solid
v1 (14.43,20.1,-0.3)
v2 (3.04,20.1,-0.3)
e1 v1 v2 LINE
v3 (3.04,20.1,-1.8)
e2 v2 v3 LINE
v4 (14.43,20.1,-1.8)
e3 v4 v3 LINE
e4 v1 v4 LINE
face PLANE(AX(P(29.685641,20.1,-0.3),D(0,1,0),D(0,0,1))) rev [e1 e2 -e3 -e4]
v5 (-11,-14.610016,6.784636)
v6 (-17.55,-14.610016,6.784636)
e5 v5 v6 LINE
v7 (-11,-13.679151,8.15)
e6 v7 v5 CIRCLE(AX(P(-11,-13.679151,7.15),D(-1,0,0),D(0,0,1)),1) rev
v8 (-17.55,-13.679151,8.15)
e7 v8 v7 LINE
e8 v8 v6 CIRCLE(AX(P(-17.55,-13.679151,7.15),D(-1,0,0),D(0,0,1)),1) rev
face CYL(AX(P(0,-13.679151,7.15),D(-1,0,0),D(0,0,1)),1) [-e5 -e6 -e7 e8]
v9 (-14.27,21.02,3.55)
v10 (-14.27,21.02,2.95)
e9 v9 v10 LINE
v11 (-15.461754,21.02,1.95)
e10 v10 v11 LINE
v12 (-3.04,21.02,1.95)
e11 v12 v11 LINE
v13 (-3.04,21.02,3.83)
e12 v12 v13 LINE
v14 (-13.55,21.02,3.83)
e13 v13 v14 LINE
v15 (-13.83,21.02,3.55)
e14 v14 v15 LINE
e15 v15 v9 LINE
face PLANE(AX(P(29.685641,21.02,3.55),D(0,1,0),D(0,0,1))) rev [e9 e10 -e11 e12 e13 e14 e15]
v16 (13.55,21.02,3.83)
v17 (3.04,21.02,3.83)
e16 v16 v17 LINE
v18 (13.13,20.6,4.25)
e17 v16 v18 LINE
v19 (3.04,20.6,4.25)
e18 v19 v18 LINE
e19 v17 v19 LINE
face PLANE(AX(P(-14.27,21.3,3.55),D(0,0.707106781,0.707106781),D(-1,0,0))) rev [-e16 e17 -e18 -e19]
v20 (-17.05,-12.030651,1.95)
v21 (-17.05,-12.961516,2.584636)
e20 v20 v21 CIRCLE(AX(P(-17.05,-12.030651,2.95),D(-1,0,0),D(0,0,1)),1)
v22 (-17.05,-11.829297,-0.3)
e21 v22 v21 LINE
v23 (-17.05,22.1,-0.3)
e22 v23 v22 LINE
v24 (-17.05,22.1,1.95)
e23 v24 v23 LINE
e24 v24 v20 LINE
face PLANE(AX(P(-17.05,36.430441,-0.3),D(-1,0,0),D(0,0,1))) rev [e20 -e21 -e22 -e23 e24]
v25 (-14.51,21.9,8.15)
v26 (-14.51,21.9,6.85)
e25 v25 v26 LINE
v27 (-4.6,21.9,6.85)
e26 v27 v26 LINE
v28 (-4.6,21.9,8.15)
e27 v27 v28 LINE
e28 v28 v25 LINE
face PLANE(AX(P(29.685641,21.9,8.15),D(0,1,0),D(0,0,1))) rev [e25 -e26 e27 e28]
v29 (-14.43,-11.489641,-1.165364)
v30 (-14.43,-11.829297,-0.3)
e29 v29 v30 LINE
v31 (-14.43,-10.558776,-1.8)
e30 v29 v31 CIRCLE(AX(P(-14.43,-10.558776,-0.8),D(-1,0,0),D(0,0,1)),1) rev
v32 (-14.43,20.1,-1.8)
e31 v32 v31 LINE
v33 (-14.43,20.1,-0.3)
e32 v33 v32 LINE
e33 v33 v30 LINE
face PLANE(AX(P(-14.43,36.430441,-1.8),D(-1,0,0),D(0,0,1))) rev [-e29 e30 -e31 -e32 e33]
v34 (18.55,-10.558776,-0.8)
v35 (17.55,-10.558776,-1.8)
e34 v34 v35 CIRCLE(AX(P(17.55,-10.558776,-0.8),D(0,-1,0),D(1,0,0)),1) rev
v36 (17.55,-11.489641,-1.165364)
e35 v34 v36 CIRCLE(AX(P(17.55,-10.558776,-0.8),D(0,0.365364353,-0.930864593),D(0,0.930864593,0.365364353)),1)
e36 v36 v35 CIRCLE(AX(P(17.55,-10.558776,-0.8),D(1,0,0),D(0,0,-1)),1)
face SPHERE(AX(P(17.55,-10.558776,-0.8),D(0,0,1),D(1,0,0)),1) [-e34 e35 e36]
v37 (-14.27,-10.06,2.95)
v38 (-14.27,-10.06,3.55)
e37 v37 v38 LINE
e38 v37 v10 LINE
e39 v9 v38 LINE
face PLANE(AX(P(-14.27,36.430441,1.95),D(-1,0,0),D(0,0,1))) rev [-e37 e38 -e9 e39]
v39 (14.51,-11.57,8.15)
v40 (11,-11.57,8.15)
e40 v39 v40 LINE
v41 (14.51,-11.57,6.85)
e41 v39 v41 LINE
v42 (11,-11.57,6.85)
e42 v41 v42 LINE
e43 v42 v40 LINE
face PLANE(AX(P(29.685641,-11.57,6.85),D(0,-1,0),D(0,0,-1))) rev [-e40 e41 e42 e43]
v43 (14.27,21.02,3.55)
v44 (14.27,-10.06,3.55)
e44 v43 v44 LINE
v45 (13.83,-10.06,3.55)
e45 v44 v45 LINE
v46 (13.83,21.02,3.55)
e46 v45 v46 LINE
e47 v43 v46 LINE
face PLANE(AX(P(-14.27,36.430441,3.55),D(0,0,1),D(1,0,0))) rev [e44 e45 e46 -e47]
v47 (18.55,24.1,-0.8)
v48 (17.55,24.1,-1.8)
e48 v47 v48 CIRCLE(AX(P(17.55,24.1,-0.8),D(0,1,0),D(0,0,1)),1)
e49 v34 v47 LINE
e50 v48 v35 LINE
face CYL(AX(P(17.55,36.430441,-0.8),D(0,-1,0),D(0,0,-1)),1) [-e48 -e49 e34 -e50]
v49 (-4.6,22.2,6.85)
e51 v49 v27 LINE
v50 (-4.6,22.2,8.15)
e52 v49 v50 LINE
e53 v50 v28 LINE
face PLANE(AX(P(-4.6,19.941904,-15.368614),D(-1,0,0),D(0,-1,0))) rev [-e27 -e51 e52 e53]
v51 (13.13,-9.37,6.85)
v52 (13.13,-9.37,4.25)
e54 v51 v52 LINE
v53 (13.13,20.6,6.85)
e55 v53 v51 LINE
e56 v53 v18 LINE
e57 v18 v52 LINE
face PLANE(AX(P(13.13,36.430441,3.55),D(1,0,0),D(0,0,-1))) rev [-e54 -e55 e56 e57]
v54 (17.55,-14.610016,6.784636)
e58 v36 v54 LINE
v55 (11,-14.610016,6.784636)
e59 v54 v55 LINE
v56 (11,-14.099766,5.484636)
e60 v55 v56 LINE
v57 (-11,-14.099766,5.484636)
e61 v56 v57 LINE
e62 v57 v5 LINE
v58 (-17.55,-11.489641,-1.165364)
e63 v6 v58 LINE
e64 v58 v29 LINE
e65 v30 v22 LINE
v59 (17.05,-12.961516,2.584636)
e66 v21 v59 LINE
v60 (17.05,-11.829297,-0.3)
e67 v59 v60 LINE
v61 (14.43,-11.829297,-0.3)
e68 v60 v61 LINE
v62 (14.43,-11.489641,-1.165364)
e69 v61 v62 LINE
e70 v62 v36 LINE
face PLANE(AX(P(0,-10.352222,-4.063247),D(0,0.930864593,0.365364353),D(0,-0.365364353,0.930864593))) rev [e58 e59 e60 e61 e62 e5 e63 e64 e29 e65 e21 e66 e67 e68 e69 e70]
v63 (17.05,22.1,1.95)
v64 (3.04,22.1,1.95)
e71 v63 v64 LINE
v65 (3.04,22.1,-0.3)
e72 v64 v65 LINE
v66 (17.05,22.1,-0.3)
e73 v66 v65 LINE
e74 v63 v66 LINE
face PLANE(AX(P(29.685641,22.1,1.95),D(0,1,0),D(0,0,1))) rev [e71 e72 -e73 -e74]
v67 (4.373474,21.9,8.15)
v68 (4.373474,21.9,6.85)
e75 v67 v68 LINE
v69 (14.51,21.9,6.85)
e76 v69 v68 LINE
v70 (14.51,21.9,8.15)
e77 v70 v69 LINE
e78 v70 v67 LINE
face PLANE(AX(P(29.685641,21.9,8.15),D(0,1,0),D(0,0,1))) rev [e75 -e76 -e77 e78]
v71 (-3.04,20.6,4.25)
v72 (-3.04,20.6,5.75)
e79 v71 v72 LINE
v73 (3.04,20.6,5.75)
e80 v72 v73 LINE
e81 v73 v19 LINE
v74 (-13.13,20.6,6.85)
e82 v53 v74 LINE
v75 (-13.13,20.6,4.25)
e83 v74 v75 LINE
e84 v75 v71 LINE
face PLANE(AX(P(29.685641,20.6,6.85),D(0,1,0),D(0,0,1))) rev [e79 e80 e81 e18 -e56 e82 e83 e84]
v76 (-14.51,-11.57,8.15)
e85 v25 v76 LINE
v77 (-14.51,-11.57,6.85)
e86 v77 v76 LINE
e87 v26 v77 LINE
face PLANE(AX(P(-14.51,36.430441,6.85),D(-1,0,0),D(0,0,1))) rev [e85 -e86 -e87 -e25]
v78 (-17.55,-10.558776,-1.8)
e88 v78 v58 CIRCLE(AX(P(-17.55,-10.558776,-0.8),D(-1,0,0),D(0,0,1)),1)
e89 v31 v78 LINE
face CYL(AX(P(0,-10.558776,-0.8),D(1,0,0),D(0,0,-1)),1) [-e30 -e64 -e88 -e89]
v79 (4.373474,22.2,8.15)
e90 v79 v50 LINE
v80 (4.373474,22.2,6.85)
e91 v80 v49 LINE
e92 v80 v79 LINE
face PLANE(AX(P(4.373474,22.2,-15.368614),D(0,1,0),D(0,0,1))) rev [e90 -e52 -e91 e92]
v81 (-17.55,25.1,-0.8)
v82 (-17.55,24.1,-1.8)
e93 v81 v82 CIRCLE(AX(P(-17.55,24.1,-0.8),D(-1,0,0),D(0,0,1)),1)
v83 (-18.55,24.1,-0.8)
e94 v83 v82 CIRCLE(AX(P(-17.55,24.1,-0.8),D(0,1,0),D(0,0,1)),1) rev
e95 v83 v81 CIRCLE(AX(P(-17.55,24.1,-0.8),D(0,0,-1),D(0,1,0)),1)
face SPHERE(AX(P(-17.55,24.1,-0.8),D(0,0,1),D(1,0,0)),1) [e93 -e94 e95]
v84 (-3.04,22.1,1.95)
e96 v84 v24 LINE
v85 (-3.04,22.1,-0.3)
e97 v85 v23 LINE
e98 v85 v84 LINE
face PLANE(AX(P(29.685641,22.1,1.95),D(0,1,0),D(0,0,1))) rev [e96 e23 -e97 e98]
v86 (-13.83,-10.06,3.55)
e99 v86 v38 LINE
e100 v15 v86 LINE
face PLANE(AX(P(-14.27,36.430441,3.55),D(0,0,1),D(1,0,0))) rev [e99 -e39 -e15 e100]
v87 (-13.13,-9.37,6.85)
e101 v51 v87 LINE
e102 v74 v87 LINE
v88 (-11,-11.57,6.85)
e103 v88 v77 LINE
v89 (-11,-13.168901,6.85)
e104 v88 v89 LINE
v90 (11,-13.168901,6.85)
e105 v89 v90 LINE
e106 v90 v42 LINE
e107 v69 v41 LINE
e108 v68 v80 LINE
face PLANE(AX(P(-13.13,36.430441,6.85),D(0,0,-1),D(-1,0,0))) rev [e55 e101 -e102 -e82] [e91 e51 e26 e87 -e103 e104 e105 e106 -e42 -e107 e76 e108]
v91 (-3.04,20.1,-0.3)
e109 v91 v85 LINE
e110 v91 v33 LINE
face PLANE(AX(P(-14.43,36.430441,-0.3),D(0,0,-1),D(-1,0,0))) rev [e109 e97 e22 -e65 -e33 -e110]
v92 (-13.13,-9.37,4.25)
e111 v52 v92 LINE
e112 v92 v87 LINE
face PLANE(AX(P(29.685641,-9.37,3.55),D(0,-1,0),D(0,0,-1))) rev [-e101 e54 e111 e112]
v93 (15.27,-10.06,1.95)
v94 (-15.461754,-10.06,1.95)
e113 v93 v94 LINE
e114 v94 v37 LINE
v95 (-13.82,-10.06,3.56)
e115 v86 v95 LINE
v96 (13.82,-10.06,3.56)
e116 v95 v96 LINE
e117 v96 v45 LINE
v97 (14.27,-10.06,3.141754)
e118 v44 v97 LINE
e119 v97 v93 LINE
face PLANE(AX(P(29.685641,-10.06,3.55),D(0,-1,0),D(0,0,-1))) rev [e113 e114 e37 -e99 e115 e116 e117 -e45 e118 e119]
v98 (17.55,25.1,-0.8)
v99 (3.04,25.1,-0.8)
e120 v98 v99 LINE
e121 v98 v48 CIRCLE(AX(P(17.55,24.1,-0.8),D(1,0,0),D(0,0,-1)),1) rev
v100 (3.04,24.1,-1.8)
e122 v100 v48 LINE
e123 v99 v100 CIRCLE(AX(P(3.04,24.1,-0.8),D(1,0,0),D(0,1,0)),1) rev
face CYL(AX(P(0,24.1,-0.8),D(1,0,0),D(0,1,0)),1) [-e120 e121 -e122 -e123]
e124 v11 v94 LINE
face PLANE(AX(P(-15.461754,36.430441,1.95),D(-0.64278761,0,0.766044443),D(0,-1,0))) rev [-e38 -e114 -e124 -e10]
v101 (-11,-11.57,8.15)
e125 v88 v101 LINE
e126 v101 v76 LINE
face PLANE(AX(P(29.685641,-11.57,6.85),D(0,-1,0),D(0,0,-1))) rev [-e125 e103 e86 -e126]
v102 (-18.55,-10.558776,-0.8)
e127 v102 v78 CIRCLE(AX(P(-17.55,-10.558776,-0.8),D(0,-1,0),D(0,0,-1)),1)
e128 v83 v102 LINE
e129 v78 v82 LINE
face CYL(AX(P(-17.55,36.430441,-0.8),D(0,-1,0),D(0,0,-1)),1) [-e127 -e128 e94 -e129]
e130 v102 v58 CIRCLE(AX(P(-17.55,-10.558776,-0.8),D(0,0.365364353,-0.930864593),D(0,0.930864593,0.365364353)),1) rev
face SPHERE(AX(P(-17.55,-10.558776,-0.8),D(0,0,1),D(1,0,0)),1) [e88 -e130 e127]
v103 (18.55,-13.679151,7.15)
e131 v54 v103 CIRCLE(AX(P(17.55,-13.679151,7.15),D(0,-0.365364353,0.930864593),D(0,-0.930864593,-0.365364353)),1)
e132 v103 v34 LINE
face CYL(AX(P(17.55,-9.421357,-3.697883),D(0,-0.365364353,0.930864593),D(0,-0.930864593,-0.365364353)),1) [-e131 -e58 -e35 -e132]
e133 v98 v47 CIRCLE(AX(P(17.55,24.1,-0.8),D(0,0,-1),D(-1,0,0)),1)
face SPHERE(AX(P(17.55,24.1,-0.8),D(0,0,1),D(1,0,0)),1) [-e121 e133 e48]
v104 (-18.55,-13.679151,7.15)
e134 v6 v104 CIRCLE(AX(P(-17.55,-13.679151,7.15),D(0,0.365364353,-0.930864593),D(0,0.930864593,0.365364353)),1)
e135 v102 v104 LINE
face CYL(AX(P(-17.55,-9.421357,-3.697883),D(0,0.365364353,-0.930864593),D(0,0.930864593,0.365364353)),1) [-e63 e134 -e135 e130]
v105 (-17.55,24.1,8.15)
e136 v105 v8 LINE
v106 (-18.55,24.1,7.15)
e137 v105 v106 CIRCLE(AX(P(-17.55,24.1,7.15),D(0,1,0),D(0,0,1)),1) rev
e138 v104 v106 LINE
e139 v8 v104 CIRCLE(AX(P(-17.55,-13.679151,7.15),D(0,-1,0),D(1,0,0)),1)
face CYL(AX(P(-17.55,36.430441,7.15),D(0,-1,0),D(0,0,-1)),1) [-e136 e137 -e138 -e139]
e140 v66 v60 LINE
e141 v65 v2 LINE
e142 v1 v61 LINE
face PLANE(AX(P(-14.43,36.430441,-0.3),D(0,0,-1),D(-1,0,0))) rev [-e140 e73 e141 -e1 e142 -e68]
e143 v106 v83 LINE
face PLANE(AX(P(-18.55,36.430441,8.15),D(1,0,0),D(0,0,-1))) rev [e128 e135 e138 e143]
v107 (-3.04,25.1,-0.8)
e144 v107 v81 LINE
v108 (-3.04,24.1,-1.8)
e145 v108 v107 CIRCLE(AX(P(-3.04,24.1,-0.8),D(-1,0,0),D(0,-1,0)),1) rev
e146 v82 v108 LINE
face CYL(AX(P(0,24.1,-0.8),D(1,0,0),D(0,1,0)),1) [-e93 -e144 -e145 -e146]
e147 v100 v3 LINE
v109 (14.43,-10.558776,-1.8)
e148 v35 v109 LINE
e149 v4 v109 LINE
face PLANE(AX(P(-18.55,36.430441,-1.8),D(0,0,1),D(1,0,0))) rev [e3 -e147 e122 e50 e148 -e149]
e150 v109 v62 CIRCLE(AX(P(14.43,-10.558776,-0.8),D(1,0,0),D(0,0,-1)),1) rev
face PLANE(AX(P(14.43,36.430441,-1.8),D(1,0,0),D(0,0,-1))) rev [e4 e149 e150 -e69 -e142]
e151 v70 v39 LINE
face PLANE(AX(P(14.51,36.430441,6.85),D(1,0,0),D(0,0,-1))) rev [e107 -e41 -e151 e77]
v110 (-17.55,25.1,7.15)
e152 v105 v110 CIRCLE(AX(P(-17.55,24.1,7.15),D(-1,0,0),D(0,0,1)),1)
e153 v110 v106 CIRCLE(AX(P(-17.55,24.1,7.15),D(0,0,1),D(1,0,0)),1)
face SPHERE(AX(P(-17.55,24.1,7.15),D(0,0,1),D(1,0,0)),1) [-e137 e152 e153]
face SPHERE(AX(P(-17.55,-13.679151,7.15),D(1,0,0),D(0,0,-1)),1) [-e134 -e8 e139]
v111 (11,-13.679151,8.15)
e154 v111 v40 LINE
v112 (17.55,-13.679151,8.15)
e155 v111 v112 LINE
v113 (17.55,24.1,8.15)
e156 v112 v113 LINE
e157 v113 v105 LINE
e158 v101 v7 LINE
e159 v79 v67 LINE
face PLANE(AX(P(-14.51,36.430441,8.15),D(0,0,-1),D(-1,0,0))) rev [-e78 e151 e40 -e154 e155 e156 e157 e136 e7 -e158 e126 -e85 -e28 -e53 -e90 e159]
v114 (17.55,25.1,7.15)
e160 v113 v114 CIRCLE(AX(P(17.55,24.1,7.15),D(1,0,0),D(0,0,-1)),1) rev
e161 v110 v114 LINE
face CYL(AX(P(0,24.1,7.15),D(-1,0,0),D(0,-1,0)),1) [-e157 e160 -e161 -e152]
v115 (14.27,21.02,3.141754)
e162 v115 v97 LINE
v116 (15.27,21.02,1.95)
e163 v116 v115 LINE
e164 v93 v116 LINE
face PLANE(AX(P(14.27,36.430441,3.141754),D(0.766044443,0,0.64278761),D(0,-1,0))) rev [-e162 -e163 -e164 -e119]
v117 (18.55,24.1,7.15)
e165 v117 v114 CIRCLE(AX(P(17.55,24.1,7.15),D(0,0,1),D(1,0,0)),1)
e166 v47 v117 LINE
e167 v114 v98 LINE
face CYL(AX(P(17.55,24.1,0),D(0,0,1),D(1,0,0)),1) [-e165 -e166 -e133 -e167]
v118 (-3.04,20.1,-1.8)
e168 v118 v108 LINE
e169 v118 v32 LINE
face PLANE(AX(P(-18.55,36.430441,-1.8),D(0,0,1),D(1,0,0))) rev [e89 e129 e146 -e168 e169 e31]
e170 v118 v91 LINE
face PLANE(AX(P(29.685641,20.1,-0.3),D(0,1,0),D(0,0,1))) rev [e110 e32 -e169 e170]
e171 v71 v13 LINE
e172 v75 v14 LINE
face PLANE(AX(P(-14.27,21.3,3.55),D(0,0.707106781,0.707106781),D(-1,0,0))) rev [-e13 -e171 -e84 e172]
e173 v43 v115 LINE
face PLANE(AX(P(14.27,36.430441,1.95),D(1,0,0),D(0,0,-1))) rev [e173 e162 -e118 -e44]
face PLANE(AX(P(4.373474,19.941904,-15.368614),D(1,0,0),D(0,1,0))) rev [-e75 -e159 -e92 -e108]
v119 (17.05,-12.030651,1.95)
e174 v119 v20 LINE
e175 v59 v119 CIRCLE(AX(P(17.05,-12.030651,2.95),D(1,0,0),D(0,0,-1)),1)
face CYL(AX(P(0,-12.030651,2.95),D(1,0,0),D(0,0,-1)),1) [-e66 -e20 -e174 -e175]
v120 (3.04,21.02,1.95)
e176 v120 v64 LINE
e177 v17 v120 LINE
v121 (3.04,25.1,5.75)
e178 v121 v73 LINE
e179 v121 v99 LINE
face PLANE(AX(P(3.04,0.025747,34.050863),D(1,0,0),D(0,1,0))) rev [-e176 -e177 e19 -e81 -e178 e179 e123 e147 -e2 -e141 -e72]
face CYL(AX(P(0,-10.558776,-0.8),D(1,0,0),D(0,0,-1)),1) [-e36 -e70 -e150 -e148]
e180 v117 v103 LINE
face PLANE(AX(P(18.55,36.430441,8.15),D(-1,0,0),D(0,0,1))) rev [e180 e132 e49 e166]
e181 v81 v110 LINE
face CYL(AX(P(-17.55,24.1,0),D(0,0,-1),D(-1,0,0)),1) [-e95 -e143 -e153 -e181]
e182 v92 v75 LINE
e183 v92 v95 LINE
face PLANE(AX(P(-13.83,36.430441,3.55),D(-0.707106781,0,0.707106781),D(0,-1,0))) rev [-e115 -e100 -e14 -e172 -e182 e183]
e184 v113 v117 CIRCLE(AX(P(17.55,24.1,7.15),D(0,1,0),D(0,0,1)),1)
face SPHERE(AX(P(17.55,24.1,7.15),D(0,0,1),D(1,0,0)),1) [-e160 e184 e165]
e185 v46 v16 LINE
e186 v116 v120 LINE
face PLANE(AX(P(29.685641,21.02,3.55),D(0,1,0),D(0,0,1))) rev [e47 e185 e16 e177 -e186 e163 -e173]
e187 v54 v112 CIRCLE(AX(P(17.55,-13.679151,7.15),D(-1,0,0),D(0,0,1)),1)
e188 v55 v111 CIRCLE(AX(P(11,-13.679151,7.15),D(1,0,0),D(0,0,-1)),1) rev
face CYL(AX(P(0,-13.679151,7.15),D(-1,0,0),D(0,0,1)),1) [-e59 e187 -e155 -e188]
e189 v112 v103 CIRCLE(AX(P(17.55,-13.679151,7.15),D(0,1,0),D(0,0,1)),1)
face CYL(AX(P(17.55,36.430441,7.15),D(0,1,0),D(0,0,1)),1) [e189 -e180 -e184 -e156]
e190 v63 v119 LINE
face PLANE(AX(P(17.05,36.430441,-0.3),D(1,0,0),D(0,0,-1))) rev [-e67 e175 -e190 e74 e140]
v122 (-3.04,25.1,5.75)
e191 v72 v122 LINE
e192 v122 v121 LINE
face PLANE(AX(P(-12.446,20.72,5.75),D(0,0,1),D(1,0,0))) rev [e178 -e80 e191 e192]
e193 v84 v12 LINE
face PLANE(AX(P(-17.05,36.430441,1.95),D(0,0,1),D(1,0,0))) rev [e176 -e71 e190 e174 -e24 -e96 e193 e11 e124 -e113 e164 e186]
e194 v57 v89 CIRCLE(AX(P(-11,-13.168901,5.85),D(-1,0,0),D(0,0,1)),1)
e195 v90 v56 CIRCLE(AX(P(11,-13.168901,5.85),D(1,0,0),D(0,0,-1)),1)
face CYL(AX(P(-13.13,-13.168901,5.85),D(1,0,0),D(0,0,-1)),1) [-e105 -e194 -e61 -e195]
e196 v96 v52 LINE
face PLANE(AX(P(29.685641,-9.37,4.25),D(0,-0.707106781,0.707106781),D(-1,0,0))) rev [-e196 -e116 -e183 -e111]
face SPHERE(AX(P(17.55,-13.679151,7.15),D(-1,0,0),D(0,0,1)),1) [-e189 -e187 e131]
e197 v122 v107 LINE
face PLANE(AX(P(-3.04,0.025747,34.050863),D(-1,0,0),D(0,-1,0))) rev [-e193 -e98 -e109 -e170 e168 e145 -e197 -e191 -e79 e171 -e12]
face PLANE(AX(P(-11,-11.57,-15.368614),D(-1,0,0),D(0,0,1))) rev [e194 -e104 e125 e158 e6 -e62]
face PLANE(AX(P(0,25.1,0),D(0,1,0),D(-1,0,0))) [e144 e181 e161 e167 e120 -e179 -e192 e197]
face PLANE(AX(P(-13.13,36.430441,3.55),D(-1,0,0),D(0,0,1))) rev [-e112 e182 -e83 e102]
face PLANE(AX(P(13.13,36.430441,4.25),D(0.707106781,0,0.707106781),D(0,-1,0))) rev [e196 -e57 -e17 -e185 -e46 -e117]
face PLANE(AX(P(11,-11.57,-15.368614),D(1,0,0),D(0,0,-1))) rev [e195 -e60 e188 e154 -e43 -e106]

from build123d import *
from OCP.BRepFilletAPI import BRepFilletAPI_MakeChamfer

# Parameters (mm, degrees)
BOSS_EXTRUDE1_START    = -18.55
BOSS_EXTRUDE1_DEPTH    = 4.04
BOSS_EXTRUDE1_START_2  = -14.51
BOSS_EXTRUDE1_2_DEPTH  = 1.38
BOSS_EXTRUDE1_3_DEPTH  = 1.5
BOSS_EXTRUDE1_4_DEPTH  = 0.24
BOSS_EXTRUDE1_5_DEPTH  = 0.08
BOSS_EXTRUDE1_START_3  = 14.51
BOSS_EXTRUDE1_6_DEPTH  = 4.04
BOSS_EXTRUDE1_START_4  = 13.13
BOSS_EXTRUDE1_7_DEPTH  = 1.38
BOSS_EXTRUDE1_START_5  = 17.05
BOSS_EXTRUDE1_8_DEPTH  = 1.5
BOSS_EXTRUDE1_START_6  = 14.27
BOSS_EXTRUDE1_9_DEPTH  = 0.24
BOSS_EXTRUDE1_START_7  = 14.43
BOSS_EXTRUDE1_10_DEPTH = 0.08
BOSS_EXTRUDE2_START    = -17.05
BOSS_EXTRUDE2_DEPTH    = 34.1
FILLET1_R              = 1
SKETCH5_W              = 22
SKETCH5_H              = 3.109151444
SKETCH5_W_2            = 8.973474185
SKETCH5_H_2            = 2.258096186
CUT_EXTRUDE1_DEPTH     = 1.3
CHAMFER1_SIZE          = 0.7
FILLET2_R              = 1
SKETCH6_W              = 6.08
SKETCH6_H              = 25.074252642
CUT_EXTRUDE2_DEPTH     = 7.55
CHAMFER3_SIZE          = 1
CHAMFER3_SIZE2         = 1.191753593


with BuildPart() as part:
    # Boss-Extrude1: read off the stored shape, not the designer's step
    # Boss-Extrude1 outline → Boss-Extrude1 (new body)
    with BuildSketch(Plane.YZ.offset(BOSS_EXTRUDE1_START)):
        Polygon((-11.240546545, -1.8), (25.1, -1.8), (25.1, -0.3), (-11.829296545, -0.3), align=None)
        Polygon((-12.712421545, 1.95), (25.1, 1.95), (25.1, 8.15), (-15.145921545, 8.15), align=None)
    extrude(amount=BOSS_EXTRUDE1_DEPTH)

    # Boss-Extrude1 2 outline → Boss-Extrude1 2 (add)
    with BuildSketch(Plane.YZ.offset(BOSS_EXTRUDE1_START_2)):
        Polygon((-13.340421545, 3.55), (25.1, 3.55), (25.1, 6.85), (-14.635671545, 6.85), align=None)
    extrude(amount=BOSS_EXTRUDE1_2_DEPTH)

    # Boss-Extrude1 3 outline → Boss-Extrude1 3 (add)
    with BuildSketch(Plane.YZ.offset(BOSS_EXTRUDE1_START)):
        Polygon((-11.829296545, -0.3), (25.1, -0.3), (25.1, 1.95), (-12.712421545, 1.95), align=None)
    extrude(amount=BOSS_EXTRUDE1_3_DEPTH)

    # Boss-Extrude1 4 outline → Boss-Extrude1 4 (add)
    with BuildSketch(Plane.YZ.offset(BOSS_EXTRUDE1_START_2)):
        Polygon((-12.712421545, 1.95), (25.1, 1.95), (25.1, 3.55), (-13.340421545, 3.55), align=None)
    extrude(amount=BOSS_EXTRUDE1_4_DEPTH)

    # Boss-Extrude1 5 outline → Boss-Extrude1 5 (add)
    with BuildSketch(Plane.YZ.offset(BOSS_EXTRUDE1_START_2)):
        Polygon((-11.240546545, -1.8), (25.1, -1.8), (25.1, -0.3), (-11.829296545, -0.3), align=None)
    extrude(amount=BOSS_EXTRUDE1_5_DEPTH)



with BuildPart() as body_2:
    # Boss-Extrude1 6 outline → Boss-Extrude1 6 (new body)
    with BuildSketch(Plane.YZ.offset(BOSS_EXTRUDE1_START_3)):
        Polygon((-11.240546545, -1.8), (25.1, -1.8), (25.1, -0.3), (-11.829296545, -0.3), align=None)
        Polygon((-12.712421545, 1.95), (25.1, 1.95), (25.1, 8.15), (-15.145921545, 8.15), align=None)
    extrude(amount=BOSS_EXTRUDE1_6_DEPTH)

    # Boss-Extrude1 7 outline → Boss-Extrude1 7 (add)
    with BuildSketch(Plane.YZ.offset(BOSS_EXTRUDE1_START_4)):
        Polygon((-13.340421545, 3.55), (25.1, 3.55), (25.1, 6.85), (-14.635671545, 6.85), align=None)
    extrude(amount=BOSS_EXTRUDE1_7_DEPTH)

    # Boss-Extrude1 8 outline → Boss-Extrude1 8 (add)
    with BuildSketch(Plane.YZ.offset(BOSS_EXTRUDE1_START_5)):
        Polygon((-11.829296545, -0.3), (25.1, -0.3), (25.1, 1.95), (-12.712421545, 1.95), align=None)
    extrude(amount=BOSS_EXTRUDE1_8_DEPTH)

    # Boss-Extrude1 9 outline → Boss-Extrude1 9 (add)
    with BuildSketch(Plane.YZ.offset(BOSS_EXTRUDE1_START_6)):
        Polygon((-12.712421545, 1.95), (25.1, 1.95), (25.1, 3.55), (-13.340421545, 3.55), align=None)
    extrude(amount=BOSS_EXTRUDE1_9_DEPTH)

    # Boss-Extrude1 10 outline → Boss-Extrude1 10 (add)
    with BuildSketch(Plane.YZ.offset(BOSS_EXTRUDE1_START_7)):
        Polygon((-11.240546545, -1.8), (25.1, -1.8), (25.1, -0.3), (-11.829296545, -0.3), align=None)
    extrude(amount=BOSS_EXTRUDE1_10_DEPTH)


with BuildPart() as part_1:
    add(part.part)

    add(body_2.part)  # Boss-Extrude2 merges body 2
    # Sketch4 → Boss-Extrude2 (add)
    with BuildSketch(Plane(origin=(0, 0, 0), x_dir=(0, 0, -1), z_dir=(1, 0, 0)).offset(BOSS_EXTRUDE2_START)):
        Polygon((1.8, 25.1), (-8.15, 25.1), (-8.15, 21.9), (-6.85, 21.9), (-6.85, 20.6), (-3.55, 20.6), (-3.55, 21.02), (-1.95, 21.02), (-1.95, 22.1), (0.3, 22.1), (0.3, 20.1), (1.8, 20.1), (1.8, 22.1), align=None)
        Polygon((-3.55, -10.06), (-1.95, -10.06), (-1.95, -12.712421545), (-8.15, -15.145921545), (-8.15, -11.57), (-6.85, -11.57), (-6.85, -9.37), (-3.55, -9.37), align=None)
    extrude(amount=BOSS_EXTRUDE2_DEPTH)

    # Fillet1
    fillet1_edges = [part_1.edges().sort_by_distance(p)[0] for p in [
        (0, -12.712421545, 1.95),
        (0, -15.145921545, 8.15),
    ]]
    fillet(fillet1_edges, radius=FILLET1_R)

    # Sketch5 → Cut-Extrude1 (cut)
    with BuildSketch(Plane.XY.offset(8.15)):
        with Locations((0, -13.124575722)):
            Rectangle(SKETCH5_W, SKETCH5_H)
        with Locations((-0.113262908, 21.070951907)):
            Rectangle(SKETCH5_W_2, SKETCH5_H_2)
    extrude(amount=-CUT_EXTRUDE1_DEPTH, mode=Mode.SUBTRACT)

    # Chamfer1
    # the kernel refuses this chamfer: 0.7 mm, written as the material it takes off along each edge
    with BuildSketch(Plane(origin=(-13.13, 20.6, 3.55), x_dir=(0, 1, 0), z_dir=(1, 0, 0))) as chamfer1_piece_1_section:
        Polygon((CHAMFER1_SIZE, 0), (0, CHAMFER1_SIZE), (0, 0), align=None)
    chamfer1_piece_1 = extrude(amount=26.26, mode=Mode.PRIVATE)
    chamfer1_piece_1 = split(chamfer1_piece_1, bisect_by=Plane(origin=(-13.13, 21.02, 3.55), z_dir=(0, -1, 0)), keep=Keep.TOP, mode=Mode.PRIVATE)
    add(chamfer1_piece_1, mode=Mode.SUBTRACT)
    with BuildSketch(Plane(origin=(13.13, -9.37, 3.55), x_dir=(1, 0, 0), z_dir=(0, 1, 0))) as chamfer1_piece_2:
        Polygon((CHAMFER1_SIZE, 0), (0, -CHAMFER1_SIZE), (0, 0), align=None)
    extrude(amount=29.97, mode=Mode.SUBTRACT)
    with BuildSketch(Plane(origin=(-13.13, -9.37, 3.55), x_dir=(0, -1, 0), z_dir=(1, 0, 0))) as chamfer1_piece_3_section:
        Polygon((CHAMFER1_SIZE, 0), (0, -CHAMFER1_SIZE), (0, 0), align=None)
    chamfer1_piece_3 = extrude(amount=26.26, mode=Mode.PRIVATE)
    chamfer1_piece_3 = split(chamfer1_piece_3, bisect_by=Plane(origin=(-13.13, -10.06, 3.55), z_dir=(0, 1, 0)), keep=Keep.TOP, mode=Mode.PRIVATE)
    add(chamfer1_piece_3, mode=Mode.SUBTRACT)
    with BuildSketch(Plane(origin=(-13.13, -9.37, 3.55), x_dir=(-1, 0, 0), z_dir=(0, 1, 0))) as chamfer1_piece_4:
        Polygon((CHAMFER1_SIZE, 0), (0, CHAMFER1_SIZE), (0, 0), align=None)
    extrude(amount=29.97, mode=Mode.SUBTRACT)
    with BuildSketch(Plane(origin=(-14.930178092, 20.6, 3.55), x_dir=(0, 1, 0), z_dir=(1, 0, 0))) as chamfer1_piece_5a_section:
        Polygon((CHAMFER1_SIZE, 0), (0, CHAMFER1_SIZE), (0, 0), align=None)
    chamfer1_piece_5a = extrude(amount=28.060178092, mode=Mode.PRIVATE)
    chamfer1_piece_5a = split(chamfer1_piece_5a, bisect_by=Plane(origin=(-14.27, 20.6, 3.55), z_dir=(1, 0, 0)), keep=Keep.TOP, mode=Mode.PRIVATE)
    chamfer1_piece_5a = split(chamfer1_piece_5a, bisect_by=Plane(origin=(-14.930178092, 21.02, 3.55), z_dir=(0, -1, 0)), keep=Keep.TOP, mode=Mode.PRIVATE)
    chamfer1_piece_5a = split(chamfer1_piece_5a, bisect_by=Plane(origin=(-13.13, 20.6, 3.55), z_dir=(-1, 0, 0)), keep=Keep.TOP, mode=Mode.PRIVATE)
    with BuildSketch(Plane(origin=(-13.13, -9.37, 3.55), x_dir=(-1, 0, 0), z_dir=(0, 1, 0))) as chamfer1_piece_5b_section:
        Polygon((CHAMFER1_SIZE, 0), (0, CHAMFER1_SIZE), (0, 0), align=None)
    chamfer1_piece_5b = extrude(amount=31.770178092, mode=Mode.PRIVATE)
    chamfer1_piece_5b = split(chamfer1_piece_5b, bisect_by=Plane(origin=(-13.13, 21.02, 3.55), z_dir=(0, -1, 0)), keep=Keep.TOP, mode=Mode.PRIVATE)
    chamfer1_piece_5b = split(chamfer1_piece_5b, bisect_by=Plane(origin=(-13.13, 20.6, 3.55), z_dir=(0, 1, 0)), keep=Keep.TOP, mode=Mode.PRIVATE)
    chamfer1_piece_5 = chamfer1_piece_5a & chamfer1_piece_5b
    add(chamfer1_piece_5, mode=Mode.SUBTRACT)
    with BuildSketch(Plane(origin=(-13.13, 20.6, 3.55), x_dir=(0, 1, 0), z_dir=(1, 0, 0))) as chamfer1_piece_6a_section:
        Polygon((CHAMFER1_SIZE, 0), (0, CHAMFER1_SIZE), (0, 0), align=None)
    chamfer1_piece_6a = extrude(amount=28.060178092, mode=Mode.PRIVATE)
    chamfer1_piece_6a = split(chamfer1_piece_6a, bisect_by=Plane(origin=(-13.13, 21.02, 3.55), z_dir=(0, -1, 0)), keep=Keep.TOP, mode=Mode.PRIVATE)
    chamfer1_piece_6a = split(chamfer1_piece_6a, bisect_by=Plane(origin=(14.27, 20.6, 3.55), z_dir=(-1, 0, 0)), keep=Keep.TOP, mode=Mode.PRIVATE)
    chamfer1_piece_6a = split(chamfer1_piece_6a, bisect_by=Plane(origin=(13.13, 20.6, 3.55), z_dir=(1, 0, 0)), keep=Keep.TOP, mode=Mode.PRIVATE)
    with BuildSketch(Plane(origin=(13.13, -9.37, 3.55), x_dir=(1, 0, 0), z_dir=(0, 1, 0))) as chamfer1_piece_6b_section:
        Polygon((CHAMFER1_SIZE, 0), (0, -CHAMFER1_SIZE), (0, 0), align=None)
    chamfer1_piece_6b = extrude(amount=31.770178092, mode=Mode.PRIVATE)
    chamfer1_piece_6b = split(chamfer1_piece_6b, bisect_by=Plane(origin=(13.13, 21.02, 3.55), z_dir=(0, -1, 0)), keep=Keep.TOP, mode=Mode.PRIVATE)
    chamfer1_piece_6b = split(chamfer1_piece_6b, bisect_by=Plane(origin=(13.13, 20.6, 3.55), z_dir=(0, 1, 0)), keep=Keep.TOP, mode=Mode.PRIVATE)
    chamfer1_piece_6 = chamfer1_piece_6a & chamfer1_piece_6b
    add(chamfer1_piece_6, mode=Mode.SUBTRACT)
    with BuildSketch(Plane(origin=(13.13, -11.170178092, 3.55), x_dir=(1, 0, 0), z_dir=(0, 1, 0))) as chamfer1_piece_7a_section:
        Polygon((CHAMFER1_SIZE, 0), (0, -CHAMFER1_SIZE), (0, 0), align=None)
    chamfer1_piece_7a = extrude(amount=31.770178092, mode=Mode.PRIVATE)
    chamfer1_piece_7a = split(chamfer1_piece_7a, bisect_by=Plane(origin=(13.13, -10.06, 3.55), z_dir=(0, 1, 0)), keep=Keep.TOP, mode=Mode.PRIVATE)
    chamfer1_piece_7a = split(chamfer1_piece_7a, bisect_by=Plane(origin=(13.13, -9.37, 3.55), z_dir=(0, -1, 0)), keep=Keep.TOP, mode=Mode.PRIVATE)
    with BuildSketch(Plane(origin=(-13.13, -9.37, 3.55), x_dir=(0, -1, 0), z_dir=(1, 0, 0))) as chamfer1_piece_7b_section:
        Polygon((CHAMFER1_SIZE, 0), (0, -CHAMFER1_SIZE), (0, 0), align=None)
    chamfer1_piece_7b = extrude(amount=28.060178092, mode=Mode.PRIVATE)
    chamfer1_piece_7b = split(chamfer1_piece_7b, bisect_by=Plane(origin=(-13.13, -10.06, 3.55), z_dir=(0, 1, 0)), keep=Keep.TOP, mode=Mode.PRIVATE)
    chamfer1_piece_7b = split(chamfer1_piece_7b, bisect_by=Plane(origin=(14.27, -9.37, 3.55), z_dir=(-1, 0, 0)), keep=Keep.TOP, mode=Mode.PRIVATE)
    chamfer1_piece_7b = split(chamfer1_piece_7b, bisect_by=Plane(origin=(13.13, -9.37, 3.55), z_dir=(1, 0, 0)), keep=Keep.TOP, mode=Mode.PRIVATE)
    chamfer1_piece_7 = chamfer1_piece_7a & chamfer1_piece_7b
    add(chamfer1_piece_7, mode=Mode.SUBTRACT)
    with BuildSketch(Plane(origin=(-14.930178092, -9.37, 3.55), x_dir=(0, -1, 0), z_dir=(1, 0, 0))) as chamfer1_piece_8a_section:
        Polygon((CHAMFER1_SIZE, 0), (0, -CHAMFER1_SIZE), (0, 0), align=None)
    chamfer1_piece_8a = extrude(amount=28.060178092, mode=Mode.PRIVATE)
    chamfer1_piece_8a = split(chamfer1_piece_8a, bisect_by=Plane(origin=(-14.27, -9.37, 3.55), z_dir=(1, 0, 0)), keep=Keep.TOP, mode=Mode.PRIVATE)
    chamfer1_piece_8a = split(chamfer1_piece_8a, bisect_by=Plane(origin=(-14.930178092, -10.06, 3.55), z_dir=(0, 1, 0)), keep=Keep.TOP, mode=Mode.PRIVATE)
    chamfer1_piece_8a = split(chamfer1_piece_8a, bisect_by=Plane(origin=(-13.13, -9.37, 3.55), z_dir=(-1, 0, 0)), keep=Keep.TOP, mode=Mode.PRIVATE)
    with BuildSketch(Plane(origin=(-13.13, -11.170178092, 3.55), x_dir=(-1, 0, 0), z_dir=(0, 1, 0))) as chamfer1_piece_8b_section:
        Polygon((CHAMFER1_SIZE, 0), (0, CHAMFER1_SIZE), (0, 0), align=None)
    chamfer1_piece_8b = extrude(amount=31.770178092, mode=Mode.PRIVATE)
    chamfer1_piece_8b = split(chamfer1_piece_8b, bisect_by=Plane(origin=(-13.13, -10.06, 3.55), z_dir=(0, 1, 0)), keep=Keep.TOP, mode=Mode.PRIVATE)
    chamfer1_piece_8b = split(chamfer1_piece_8b, bisect_by=Plane(origin=(-13.13, -9.37, 3.55), z_dir=(0, -1, 0)), keep=Keep.TOP, mode=Mode.PRIVATE)
    chamfer1_piece_8 = chamfer1_piece_8a & chamfer1_piece_8b
    add(chamfer1_piece_8, mode=Mode.SUBTRACT)

    # Fillet2
    # the kernel refuses this fillet: 1 mm, written as the material it takes off along each edge
    with BuildSketch(Plane(origin=(-17.55, 24.1, 7.15), x_dir=(-1, 0, 0), z_dir=(0, 0, 1))) as fillet2_piece_1_section:
        Polygon((0, 0), (FILLET2_R, 0), (FILLET2_R, -FILLET2_R), (0, -FILLET2_R), align=None)
    fillet2_piece_1 = extrude(amount=FILLET2_R, mode=Mode.PRIVATE)
    fillet2_piece_1 = fillet2_piece_1 - Plane(origin=(-17.55, 24.1, 7.15), x_dir=(0.7071067811865475, -0.7071067811865475, 0), z_dir=(0, 0, 1)) * Sphere(FILLET2_R, mode=Mode.PRIVATE)
    add(fillet2_piece_1, mode=Mode.SUBTRACT)
    with BuildSketch(Plane(origin=(17.55, -10.558776444, -0.8), x_dir=(0, 0, -1), z_dir=(1, 0, 0))) as fillet2_piece_2_section:
        Polygon((0, 0), (FILLET2_R, 0), (FILLET2_R, -FILLET2_R * 0.681770101045), (FILLET2_R * 0.365364352613, -FILLET2_R * 0.930864592645), align=None)
    fillet2_piece_2 = extrude(amount=FILLET2_R, mode=Mode.PRIVATE)
    fillet2_piece_2 = fillet2_piece_2 - Plane(origin=(17.55, -10.558776444, -0.8), x_dir=(0, 0.5633097049523215, 0.8262458328527464), z_dir=(1, 0, 0)) * Sphere(FILLET2_R, mode=Mode.PRIVATE)
    add(fillet2_piece_2, mode=Mode.SUBTRACT)
    with BuildSketch(Plane(origin=(-17.55, -10.558776444, -0.8), x_dir=(0, -0.9308645926447314, -0.36536435261305716), z_dir=(-1, 0, 0))) as fillet2_piece_3_section:
        Polygon((0, 0), (FILLET2_R, 0), (FILLET2_R, -FILLET2_R * 0.681770101045), (FILLET2_R * 0.365364352613, -FILLET2_R * 0.930864592645), align=None)
    fillet2_piece_3 = extrude(amount=FILLET2_R, mode=Mode.PRIVATE)
    fillet2_piece_3 = fillet2_piece_3 - Plane(origin=(-17.55, -10.558776444, -0.8), x_dir=(0, 0.5633097049523215, 0.8262458328527464), z_dir=(-1, 0, 0)) * Sphere(FILLET2_R, mode=Mode.PRIVATE)
    add(fillet2_piece_3, mode=Mode.SUBTRACT)
    with BuildSketch(Plane(origin=(17.55, 24.1, 7.15), x_dir=(0, 0, 1), z_dir=(1, 0, 0))) as fillet2_piece_4_section:
        Polygon((0, 0), (FILLET2_R, 0), (FILLET2_R, -FILLET2_R), (0, -FILLET2_R), align=None)
    fillet2_piece_4 = extrude(amount=FILLET2_R, mode=Mode.PRIVATE)
    fillet2_piece_4 = fillet2_piece_4 - Plane(origin=(17.55, 24.1, 7.15), x_dir=(0, -0.7071067811865475, -0.7071067811865475), z_dir=(1, 0, 0)) * Sphere(FILLET2_R, mode=Mode.PRIVATE)
    add(fillet2_piece_4, mode=Mode.SUBTRACT)
    with BuildSketch(Plane(origin=(17.55, 24.1, -0.8), x_dir=(0, 0, -1), z_dir=(1, 0, 0))) as fillet2_piece_5_section:
        Polygon((0, 0), (FILLET2_R, 0), (FILLET2_R, FILLET2_R), (0, FILLET2_R), align=None)
    fillet2_piece_5 = extrude(amount=FILLET2_R, mode=Mode.PRIVATE)
    fillet2_piece_5 = fillet2_piece_5 - Plane(origin=(17.55, 24.1, -0.8), x_dir=(0, -0.7071067811865475, 0.7071067811865475), z_dir=(1, 0, 0)) * Sphere(FILLET2_R, mode=Mode.PRIVATE)
    add(fillet2_piece_5, mode=Mode.SUBTRACT)
    with BuildSketch(Plane(origin=(-17.55, 24.1, -0.8), x_dir=(-1, 0, 0), z_dir=(0, 0, -1))) as fillet2_piece_6_section:
        Polygon((0, 0), (FILLET2_R, 0), (FILLET2_R, FILLET2_R), (0, FILLET2_R), align=None)
    fillet2_piece_6 = extrude(amount=FILLET2_R, mode=Mode.PRIVATE)
    fillet2_piece_6 = fillet2_piece_6 - Plane(origin=(-17.55, 24.1, -0.8), x_dir=(0.7071067811865475, -0.7071067811865475, 0), z_dir=(0, 0, -1)) * Sphere(FILLET2_R, mode=Mode.PRIVATE)
    add(fillet2_piece_6, mode=Mode.SUBTRACT)
    with BuildSketch(Plane(origin=(-18.55, 24.1, 8.15), x_dir=(0, 0, -1), z_dir=(0, -1, 0))) as fillet2_piece_7:
        with BuildLine():
            CenterArc((FILLET2_R, FILLET2_R), FILLET2_R, 180, 90)
            Line((0, FILLET2_R), (0, 0))
            Line((0, 0), (FILLET2_R, 0))
        make_face()
    extrude(amount=37.779151444, mode=Mode.SUBTRACT)
    with BuildSketch(Plane(origin=(18.55, -11.489641037, -1.165364353), x_dir=(0, 0.9308645926447314, 0.36536435261305694), z_dir=(0, -0.365364352613057, 0.9308645926447315)), Plane(origin=(-18.55, -14.610016037, 6.784635647), x_dir=(0, 0.9308645926447315, 0.365364352613057), z_dir=(0, 0.365364352613057, -0.9308645926447315))) as fillet2_piece_8:
        with BuildLine():
            CenterArc((FILLET2_R, FILLET2_R), FILLET2_R, 180, 90)
            Line((0, FILLET2_R), (0, 0))
            Line((0, 0), (FILLET2_R, 0))
        make_face()
    extrude(amount=8.540447303, mode=Mode.SUBTRACT)
    with BuildSketch(Plane(origin=(12.725574747, -11.240546545, -1.8), x_dir=(0, 1, 0), z_dir=(1, 0, 0)), Plane(origin=(-17.55, -11.240546545, -1.8), x_dir=(0, 1, 0), z_dir=(1, 0, 0))) as fillet2_piece_9:
        with BuildLine():
            CenterArc((FILLET2_R * 0.681770101045, FILLET2_R), FILLET2_R, 201.430007302, 68.569992698)
            Line((-FILLET2_R * 0.249094491599, FILLET2_R * 0.634635647387), (0, 0))
            Line((0, 0), (FILLET2_R * 0.681770101045, 0))
        make_face()
    extrude(amount=4.824425253, mode=Mode.SUBTRACT)
    with BuildSketch(Plane(origin=(-18.55, -13.679151444, 7.15), x_dir=(0, -0.930864592644731, -0.3653643526130583), z_dir=(0, 0.3653643526130583, -0.930864592644731))) as fillet2_piece_10:
        with BuildLine():
            CenterArc((1 - FILLET2_R, -FILLET2_R), FILLET2_R, 0, 90)
            Line((1, -FILLET2_R), (1, 0))
            Line((1, 0), (1 - FILLET2_R, 0))
        make_face()
    revolve(axis=Axis((-18.55, -13.679151444, 7.15), (-1, 0, 0)), revolution_arc=111.430007302, mode=Mode.SUBTRACT)
    with BuildSketch(Plane(origin=(18.55, 24.1, 8.15), x_dir=(0, 0, -1), z_dir=(0, -1, 0))) as fillet2_piece_11:
        with BuildLine():
            CenterArc((FILLET2_R, -FILLET2_R), FILLET2_R, 90, 90)
            Line((0, -FILLET2_R), (0, 0))
            Line((0, 0), (FILLET2_R, 0))
        make_face()
    extrude(amount=37.779151444, mode=Mode.SUBTRACT)
    with BuildSketch(Plane(origin=(18.55, -13.679151444, 7.15), x_dir=(0, -0.9308645926447313, -0.3653643526130575), z_dir=(0, 0.3653643526130575, -0.9308645926447313))) as fillet2_piece_12:
        with BuildLine():
            CenterArc((1 - FILLET2_R, FILLET2_R), FILLET2_R, 270, 90)
            Line((1, FILLET2_R), (1, 0))
            Line((1, 0), (1 - FILLET2_R, 0))
        make_face()
    revolve(axis=Axis((18.55, -13.679151444, 7.15), (-1, 0, 0)), revolution_arc=111.430007302, mode=Mode.SUBTRACT)
    with BuildSketch(Plane(origin=(-11, -14.633090645, 6.85), x_dir=(0, 1, 0), z_dir=(1, 0, 0))) as fillet2_piece_13:
        with BuildLine():
            CenterArc((1.464189201, -1), FILLET2_R, 90, 111.430007302)
            Line((0.533324609, -1.365364353), (0.44023815, -1.401900788))
            ThreePointArc((0.44023815, -1.401900788), (-0.07001185, -0.101900788), (-0.09539392, -0.03))
            Line((-0.09539392, -0.03), (0, 0.1))
            Line((0, 0.1), (1.464189201, 0.1))
            Line((1.464189201, 0.1), (1.464189201, 0))
        make_face()
    extrude(amount=22, mode=Mode.SUBTRACT)
    with BuildSketch(Plane(origin=(17.55, 25.1, -1.8), x_dir=(0, -1, 0), z_dir=(-1, 0, 0))) as fillet2_piece_14:
        with BuildLine():
            CenterArc((FILLET2_R, FILLET2_R), FILLET2_R, 180, 90)
            Line((0, FILLET2_R), (0, 0))
            Line((0, 0), (FILLET2_R, 0))
        make_face()
    extrude(amount=35.1, mode=Mode.SUBTRACT)
    with BuildSketch(Plane(origin=(-18.55, 25.1, -0.8), x_dir=(0, -1, 0), z_dir=(0, 0, 1)), Plane(origin=(18.55, 25.1, 7.15), x_dir=(0, -1, 0), z_dir=(0, 0, -1))) as fillet2_piece_15:
        with BuildLine():
            CenterArc((FILLET2_R, FILLET2_R), FILLET2_R, 180, 90)
            Line((0, FILLET2_R), (0, 0))
            Line((0, 0), (FILLET2_R, 0))
        make_face()
    extrude(amount=7.95, mode=Mode.SUBTRACT)
    with BuildSketch(Plane(origin=(-17.55, 25.1, 8.15), x_dir=(0, 0, -1), z_dir=(1, 0, 0))) as fillet2_piece_16:
        with BuildLine():
            CenterArc((FILLET2_R, -FILLET2_R), FILLET2_R, 90, 90)
            Line((0, -FILLET2_R), (0, 0))
            Line((0, 0), (FILLET2_R, 0))
        make_face()
    extrude(amount=35.1, mode=Mode.SUBTRACT)
    with BuildSketch(Plane(origin=(18.55, -10.558776444, -1.8), x_dir=(0, 0, 1), z_dir=(0, 1, 0)), Plane(origin=(-18.55, -10.558776444, -1.8), x_dir=(1, 0, 0), z_dir=(0, 1, 0))) as fillet2_piece_17:
        with BuildLine():
            CenterArc((FILLET2_R, -FILLET2_R), FILLET2_R, 90, 90)
            Line((0, -FILLET2_R), (0, 0))
            Line((0, 0), (FILLET2_R, 0))
        make_face()
    extrude(amount=34.658776444, mode=Mode.SUBTRACT)

    # Sketch6 → Cut-Extrude2 (cut)
    with BuildSketch(Plane(origin=(0, 0, -1.8), x_dir=(-1, 0, 0), z_dir=(0, 0, -1))):
        with Locations((0, 12.562873679)):
            Rectangle(SKETCH6_W, SKETCH6_H)
    extrude(amount=-CUT_EXTRUDE2_DEPTH, mode=Mode.SUBTRACT)

    # Chamfer3: one chamfer whose edges measure the first distance from different faces: ONE call of the kernel's chamfer builder (chamfer() names one face for all edges)
    chamfer3_edges_1 = [part_1.edges().sort_by_distance(p)[0] for p in [
        (14.27, 5.48, 1.95),
    ]]
    chamfer3_side_1 = [part_1.faces().sort_by_distance(p)[0] for p in [
        (-16.567536388, 5.034674278, 1.95),
    ]]
    chamfer3_edges_2 = [part_1.edges().sort_by_distance(p)[0] for p in [
        (-14.27, 5.48, 1.95),
    ]]
    chamfer3_side_2 = [part_1.faces().sort_by_distance(p)[0] for p in [
        (-14.27, 5.48, 2.75),
    ]]
    chamfer3 = BRepFilletAPI_MakeChamfer(part_1.part.solid().wrapped)
    for e in chamfer3_edges_1:
        chamfer3.Add(CHAMFER3_SIZE, CHAMFER3_SIZE2, e.wrapped, chamfer3_side_1[0].wrapped)  # the first distance lies on this face
    for e in chamfer3_edges_2:
        chamfer3.Add(CHAMFER3_SIZE, CHAMFER3_SIZE2, e.wrapped, chamfer3_side_2[0].wrapped)  # the first distance lies on this face
    add(Compound.cast(chamfer3.Shape()), mode=Mode.REPLACE)


solid = part_1.part
